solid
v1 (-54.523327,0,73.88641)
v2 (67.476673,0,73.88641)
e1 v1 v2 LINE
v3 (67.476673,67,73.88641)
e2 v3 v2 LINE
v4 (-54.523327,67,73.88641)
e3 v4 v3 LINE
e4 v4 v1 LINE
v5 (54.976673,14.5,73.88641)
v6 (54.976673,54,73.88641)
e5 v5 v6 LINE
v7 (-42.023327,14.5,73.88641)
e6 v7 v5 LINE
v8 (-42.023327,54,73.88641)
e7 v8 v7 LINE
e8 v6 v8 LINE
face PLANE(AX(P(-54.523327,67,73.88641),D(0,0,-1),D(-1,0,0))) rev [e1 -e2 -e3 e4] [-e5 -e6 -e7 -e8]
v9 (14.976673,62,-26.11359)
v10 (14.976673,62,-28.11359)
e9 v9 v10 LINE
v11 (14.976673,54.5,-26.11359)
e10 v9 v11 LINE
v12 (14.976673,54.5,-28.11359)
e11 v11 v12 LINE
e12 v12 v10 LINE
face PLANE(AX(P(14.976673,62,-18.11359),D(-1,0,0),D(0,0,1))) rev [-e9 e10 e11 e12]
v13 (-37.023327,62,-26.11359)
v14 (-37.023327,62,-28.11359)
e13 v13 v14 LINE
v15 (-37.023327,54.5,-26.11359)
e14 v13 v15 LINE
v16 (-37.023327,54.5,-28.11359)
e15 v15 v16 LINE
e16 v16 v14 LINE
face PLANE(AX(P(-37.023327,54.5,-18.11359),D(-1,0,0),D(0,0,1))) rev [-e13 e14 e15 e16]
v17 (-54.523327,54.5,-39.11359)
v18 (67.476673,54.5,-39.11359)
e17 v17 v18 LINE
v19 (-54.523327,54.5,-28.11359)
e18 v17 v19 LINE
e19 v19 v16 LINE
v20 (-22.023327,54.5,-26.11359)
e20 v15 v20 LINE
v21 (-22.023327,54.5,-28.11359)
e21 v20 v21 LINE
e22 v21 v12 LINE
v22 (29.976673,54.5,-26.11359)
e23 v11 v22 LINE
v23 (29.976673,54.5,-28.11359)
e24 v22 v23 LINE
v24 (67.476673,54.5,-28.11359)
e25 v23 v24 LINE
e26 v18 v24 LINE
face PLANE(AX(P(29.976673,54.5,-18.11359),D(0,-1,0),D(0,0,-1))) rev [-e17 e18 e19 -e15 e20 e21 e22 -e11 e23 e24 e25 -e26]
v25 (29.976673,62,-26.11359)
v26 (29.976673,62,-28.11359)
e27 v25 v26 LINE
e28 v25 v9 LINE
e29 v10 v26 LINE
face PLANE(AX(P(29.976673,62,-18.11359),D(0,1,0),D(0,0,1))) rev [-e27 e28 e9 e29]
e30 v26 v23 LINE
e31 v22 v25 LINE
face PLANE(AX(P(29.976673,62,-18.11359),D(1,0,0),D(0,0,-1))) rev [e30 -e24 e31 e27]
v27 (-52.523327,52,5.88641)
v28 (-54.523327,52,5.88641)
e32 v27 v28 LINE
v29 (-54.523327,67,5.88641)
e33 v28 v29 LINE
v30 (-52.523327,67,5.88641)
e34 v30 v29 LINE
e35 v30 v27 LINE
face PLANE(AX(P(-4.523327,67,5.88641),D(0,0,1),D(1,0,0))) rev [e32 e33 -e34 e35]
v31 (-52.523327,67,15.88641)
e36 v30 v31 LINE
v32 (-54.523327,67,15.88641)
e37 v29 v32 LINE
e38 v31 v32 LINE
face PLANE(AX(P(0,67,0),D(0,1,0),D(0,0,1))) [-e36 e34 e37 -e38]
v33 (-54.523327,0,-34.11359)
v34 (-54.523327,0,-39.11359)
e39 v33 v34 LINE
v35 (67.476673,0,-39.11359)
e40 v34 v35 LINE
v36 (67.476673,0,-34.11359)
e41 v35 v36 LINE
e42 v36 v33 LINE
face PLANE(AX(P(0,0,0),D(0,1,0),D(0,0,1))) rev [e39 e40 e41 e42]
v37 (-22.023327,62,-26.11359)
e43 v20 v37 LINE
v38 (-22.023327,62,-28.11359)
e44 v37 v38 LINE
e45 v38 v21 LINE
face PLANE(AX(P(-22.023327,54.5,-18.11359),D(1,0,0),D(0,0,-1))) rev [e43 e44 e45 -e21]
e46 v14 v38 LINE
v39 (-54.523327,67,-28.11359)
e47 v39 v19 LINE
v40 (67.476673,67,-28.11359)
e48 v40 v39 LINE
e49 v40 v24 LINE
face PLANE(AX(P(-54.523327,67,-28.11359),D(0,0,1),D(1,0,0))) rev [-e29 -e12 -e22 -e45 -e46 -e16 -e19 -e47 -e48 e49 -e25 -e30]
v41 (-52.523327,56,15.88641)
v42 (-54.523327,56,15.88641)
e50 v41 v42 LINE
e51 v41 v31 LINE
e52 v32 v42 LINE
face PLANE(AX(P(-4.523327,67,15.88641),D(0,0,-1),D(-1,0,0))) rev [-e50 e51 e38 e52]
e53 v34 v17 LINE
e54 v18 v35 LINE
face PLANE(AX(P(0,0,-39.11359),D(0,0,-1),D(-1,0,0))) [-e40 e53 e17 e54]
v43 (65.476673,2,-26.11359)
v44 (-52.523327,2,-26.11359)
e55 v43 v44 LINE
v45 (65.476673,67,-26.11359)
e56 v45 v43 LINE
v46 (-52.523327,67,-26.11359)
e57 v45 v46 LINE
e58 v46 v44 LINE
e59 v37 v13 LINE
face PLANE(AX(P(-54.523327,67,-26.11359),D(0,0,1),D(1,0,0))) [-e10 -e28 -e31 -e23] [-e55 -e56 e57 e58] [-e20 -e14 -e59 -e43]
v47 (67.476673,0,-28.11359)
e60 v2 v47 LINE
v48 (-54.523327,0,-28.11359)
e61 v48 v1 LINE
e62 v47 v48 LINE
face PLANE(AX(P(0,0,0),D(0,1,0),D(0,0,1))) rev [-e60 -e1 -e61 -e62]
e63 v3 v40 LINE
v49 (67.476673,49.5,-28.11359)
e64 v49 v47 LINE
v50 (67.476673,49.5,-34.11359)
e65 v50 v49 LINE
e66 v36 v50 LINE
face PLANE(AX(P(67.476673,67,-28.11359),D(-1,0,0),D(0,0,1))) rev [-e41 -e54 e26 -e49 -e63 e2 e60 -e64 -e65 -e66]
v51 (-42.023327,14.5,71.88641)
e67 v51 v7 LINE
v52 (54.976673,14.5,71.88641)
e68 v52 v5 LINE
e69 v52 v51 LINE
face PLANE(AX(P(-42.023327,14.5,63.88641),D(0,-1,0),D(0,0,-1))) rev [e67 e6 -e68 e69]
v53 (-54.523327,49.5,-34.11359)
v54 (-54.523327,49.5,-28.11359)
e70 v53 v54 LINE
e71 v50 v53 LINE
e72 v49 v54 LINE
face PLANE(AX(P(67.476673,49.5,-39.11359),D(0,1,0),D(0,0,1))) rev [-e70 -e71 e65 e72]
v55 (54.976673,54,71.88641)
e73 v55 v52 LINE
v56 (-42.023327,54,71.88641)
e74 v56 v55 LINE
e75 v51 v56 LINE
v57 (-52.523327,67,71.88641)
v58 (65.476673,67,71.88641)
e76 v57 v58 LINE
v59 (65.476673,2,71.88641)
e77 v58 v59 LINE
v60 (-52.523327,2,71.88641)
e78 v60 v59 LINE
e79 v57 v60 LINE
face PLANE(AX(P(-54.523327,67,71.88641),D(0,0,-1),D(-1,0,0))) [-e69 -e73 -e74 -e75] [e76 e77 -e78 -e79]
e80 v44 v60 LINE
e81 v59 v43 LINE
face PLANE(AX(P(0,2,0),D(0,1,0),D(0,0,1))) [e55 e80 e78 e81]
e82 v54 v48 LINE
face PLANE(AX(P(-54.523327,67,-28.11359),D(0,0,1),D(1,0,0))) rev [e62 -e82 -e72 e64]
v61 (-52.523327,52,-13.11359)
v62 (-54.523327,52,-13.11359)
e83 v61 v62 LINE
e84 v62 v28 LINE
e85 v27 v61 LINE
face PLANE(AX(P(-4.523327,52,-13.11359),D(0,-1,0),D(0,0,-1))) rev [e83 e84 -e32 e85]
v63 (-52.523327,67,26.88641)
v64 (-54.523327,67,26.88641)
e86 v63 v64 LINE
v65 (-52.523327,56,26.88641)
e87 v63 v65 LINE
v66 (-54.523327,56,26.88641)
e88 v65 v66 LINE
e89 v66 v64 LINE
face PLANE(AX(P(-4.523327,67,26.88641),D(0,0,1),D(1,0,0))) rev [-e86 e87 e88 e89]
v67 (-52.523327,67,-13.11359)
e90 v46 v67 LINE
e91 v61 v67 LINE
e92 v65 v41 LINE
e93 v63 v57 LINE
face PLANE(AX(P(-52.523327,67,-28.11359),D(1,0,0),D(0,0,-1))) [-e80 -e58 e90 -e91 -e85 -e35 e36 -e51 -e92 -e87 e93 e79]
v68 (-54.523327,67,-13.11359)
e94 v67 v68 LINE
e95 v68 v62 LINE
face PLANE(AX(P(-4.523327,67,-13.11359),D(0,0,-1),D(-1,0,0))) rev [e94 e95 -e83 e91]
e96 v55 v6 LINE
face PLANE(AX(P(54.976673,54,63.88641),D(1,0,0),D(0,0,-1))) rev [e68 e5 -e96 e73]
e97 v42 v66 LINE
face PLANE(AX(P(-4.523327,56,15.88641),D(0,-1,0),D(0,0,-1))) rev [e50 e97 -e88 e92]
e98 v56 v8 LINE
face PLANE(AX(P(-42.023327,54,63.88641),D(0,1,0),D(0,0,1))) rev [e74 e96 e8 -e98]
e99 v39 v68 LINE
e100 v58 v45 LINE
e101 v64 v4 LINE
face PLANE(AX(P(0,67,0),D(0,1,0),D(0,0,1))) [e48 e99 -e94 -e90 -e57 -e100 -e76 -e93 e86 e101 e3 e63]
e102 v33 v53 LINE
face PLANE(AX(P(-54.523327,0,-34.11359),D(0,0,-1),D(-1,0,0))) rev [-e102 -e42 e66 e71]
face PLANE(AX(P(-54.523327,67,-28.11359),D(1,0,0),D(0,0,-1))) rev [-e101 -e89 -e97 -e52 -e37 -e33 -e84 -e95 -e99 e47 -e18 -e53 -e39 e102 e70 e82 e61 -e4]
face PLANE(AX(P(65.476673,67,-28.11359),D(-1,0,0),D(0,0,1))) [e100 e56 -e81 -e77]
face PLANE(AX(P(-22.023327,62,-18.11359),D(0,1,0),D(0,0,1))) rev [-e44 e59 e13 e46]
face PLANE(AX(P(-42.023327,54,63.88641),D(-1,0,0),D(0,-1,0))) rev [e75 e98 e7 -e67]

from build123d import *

# Parameters (mm, degrees)
STOCK_BOX_1_OUTLINE_W   = 122
STOCK_BOX_1_OUTLINE_H   = 102
STOCK_BOX_1_OUTLINE_W_2 = 118
STOCK_BOX_1_OUTLINE_H_2 = 98
STOCK_BOX_1_DEPTH       = 67
STOCK_BOX_1_2_OUTLINE_W = 118
STOCK_BOX_1_2_OUTLINE_H = 98
STOCK_BOX_1_2_DEPTH     = 2
SKETCH1_W               = 97
SKETCH1_H               = 39.5
CUT_EXTRUDE1_DEPTH      = 10
SKETCH2_W               = 15
SKETCH2_H               = 7.5
CUT_EXTRUDE2_DEPTH      = 10
SKETCH3_W               = 122
SKETCH3_H               = 5
BOSS_EXTRUDE1_DEPTH     = 11
SKETCH5_W               = 122
SKETCH5_H               = 5
BOSS_EXTRUDE2_DEPTH     = 49.5
SKETCH6_W               = 19
SKETCH6_H               = 15
SKETCH6_W_2             = 11
SKETCH6_H_2             = 11
CUT_EXTRUDE3_DEPTH      = 50


# Read off the part's stored shape, not the designer's step: Stock-Box-1
with BuildPart() as part:
    # Stock-Box-1 outline → Stock-Box-1 (new body)
    with BuildSketch(Plane(origin=(0, 0, 0), x_dir=(1, 0, 0), z_dir=(0, 1, 0))):
        with Locations((6.476673428, -22.886409736)):
            Rectangle(STOCK_BOX_1_OUTLINE_W, STOCK_BOX_1_OUTLINE_H)
        with Locations((6.476673428, -22.886409736)):
            Rectangle(STOCK_BOX_1_OUTLINE_W_2, STOCK_BOX_1_OUTLINE_H_2, mode=Mode.SUBTRACT)
    extrude(amount=STOCK_BOX_1_DEPTH)

    # Stock-Box-1 2 outline → Stock-Box-1 2 (add)
    with BuildSketch(Plane(origin=(0, 0, 0), x_dir=(1, 0, 0), z_dir=(0, 1, 0))):
        with Locations((6.476673428, -22.886409736)):
            Rectangle(STOCK_BOX_1_2_OUTLINE_W, STOCK_BOX_1_2_OUTLINE_H)
    extrude(amount=STOCK_BOX_1_2_DEPTH)

    # Sketch1 → Cut-Extrude1 (cut)
    with BuildSketch(Plane.XY.offset(73.886409736)):
        with Locations((6.476673428, 34.25)):
            Rectangle(SKETCH1_W, SKETCH1_H)
    extrude(amount=-CUT_EXTRUDE1_DEPTH, mode=Mode.SUBTRACT)

    # Sketch2 → Cut-Extrude2 (cut)
    with BuildSketch(Plane(origin=(0, 0, -28.113590264), x_dir=(-1, 0, 0), z_dir=(0, 0, -1))):
        with Locations((-22.476673428, 58.25)):
            Rectangle(SKETCH2_W, SKETCH2_H)
        with Locations((29.523326572, 58.25)):
            Rectangle(SKETCH2_W, SKETCH2_H)
    extrude(amount=-CUT_EXTRUDE2_DEPTH, mode=Mode.SUBTRACT)

    # Sketch3 → Boss-Extrude1 (add)
    with BuildSketch(Plane(origin=(0, 0, -28.113590264), x_dir=(-1, 0, 0), z_dir=(0, 0, -1))):
        with Locations((-6.476673428, 52)):
            Rectangle(SKETCH3_W, SKETCH3_H)
    extrude(amount=BOSS_EXTRUDE1_DEPTH)

    # Sketch5 → Boss-Extrude2 (add)
    with BuildSketch(Plane.XZ.offset(-49.5)):
        with Locations((6.476673428, -36.613590264)):
            Rectangle(SKETCH5_W, SKETCH5_H)
    extrude(amount=BOSS_EXTRUDE2_DEPTH)

    # Sketch6 → Cut-Extrude3 (cut)
    with BuildSketch(Plane.ZY.offset(54.523326572)):
        with Locations((-3.613590264, 59.5)):
            Rectangle(SKETCH6_W, SKETCH6_H)
        with Locations((21.386409736, 61.5)):
            Rectangle(SKETCH6_W_2, SKETCH6_H_2)
    extrude(amount=-CUT_EXTRUDE3_DEPTH, mode=Mode.SUBTRACT)


solid = part.part
